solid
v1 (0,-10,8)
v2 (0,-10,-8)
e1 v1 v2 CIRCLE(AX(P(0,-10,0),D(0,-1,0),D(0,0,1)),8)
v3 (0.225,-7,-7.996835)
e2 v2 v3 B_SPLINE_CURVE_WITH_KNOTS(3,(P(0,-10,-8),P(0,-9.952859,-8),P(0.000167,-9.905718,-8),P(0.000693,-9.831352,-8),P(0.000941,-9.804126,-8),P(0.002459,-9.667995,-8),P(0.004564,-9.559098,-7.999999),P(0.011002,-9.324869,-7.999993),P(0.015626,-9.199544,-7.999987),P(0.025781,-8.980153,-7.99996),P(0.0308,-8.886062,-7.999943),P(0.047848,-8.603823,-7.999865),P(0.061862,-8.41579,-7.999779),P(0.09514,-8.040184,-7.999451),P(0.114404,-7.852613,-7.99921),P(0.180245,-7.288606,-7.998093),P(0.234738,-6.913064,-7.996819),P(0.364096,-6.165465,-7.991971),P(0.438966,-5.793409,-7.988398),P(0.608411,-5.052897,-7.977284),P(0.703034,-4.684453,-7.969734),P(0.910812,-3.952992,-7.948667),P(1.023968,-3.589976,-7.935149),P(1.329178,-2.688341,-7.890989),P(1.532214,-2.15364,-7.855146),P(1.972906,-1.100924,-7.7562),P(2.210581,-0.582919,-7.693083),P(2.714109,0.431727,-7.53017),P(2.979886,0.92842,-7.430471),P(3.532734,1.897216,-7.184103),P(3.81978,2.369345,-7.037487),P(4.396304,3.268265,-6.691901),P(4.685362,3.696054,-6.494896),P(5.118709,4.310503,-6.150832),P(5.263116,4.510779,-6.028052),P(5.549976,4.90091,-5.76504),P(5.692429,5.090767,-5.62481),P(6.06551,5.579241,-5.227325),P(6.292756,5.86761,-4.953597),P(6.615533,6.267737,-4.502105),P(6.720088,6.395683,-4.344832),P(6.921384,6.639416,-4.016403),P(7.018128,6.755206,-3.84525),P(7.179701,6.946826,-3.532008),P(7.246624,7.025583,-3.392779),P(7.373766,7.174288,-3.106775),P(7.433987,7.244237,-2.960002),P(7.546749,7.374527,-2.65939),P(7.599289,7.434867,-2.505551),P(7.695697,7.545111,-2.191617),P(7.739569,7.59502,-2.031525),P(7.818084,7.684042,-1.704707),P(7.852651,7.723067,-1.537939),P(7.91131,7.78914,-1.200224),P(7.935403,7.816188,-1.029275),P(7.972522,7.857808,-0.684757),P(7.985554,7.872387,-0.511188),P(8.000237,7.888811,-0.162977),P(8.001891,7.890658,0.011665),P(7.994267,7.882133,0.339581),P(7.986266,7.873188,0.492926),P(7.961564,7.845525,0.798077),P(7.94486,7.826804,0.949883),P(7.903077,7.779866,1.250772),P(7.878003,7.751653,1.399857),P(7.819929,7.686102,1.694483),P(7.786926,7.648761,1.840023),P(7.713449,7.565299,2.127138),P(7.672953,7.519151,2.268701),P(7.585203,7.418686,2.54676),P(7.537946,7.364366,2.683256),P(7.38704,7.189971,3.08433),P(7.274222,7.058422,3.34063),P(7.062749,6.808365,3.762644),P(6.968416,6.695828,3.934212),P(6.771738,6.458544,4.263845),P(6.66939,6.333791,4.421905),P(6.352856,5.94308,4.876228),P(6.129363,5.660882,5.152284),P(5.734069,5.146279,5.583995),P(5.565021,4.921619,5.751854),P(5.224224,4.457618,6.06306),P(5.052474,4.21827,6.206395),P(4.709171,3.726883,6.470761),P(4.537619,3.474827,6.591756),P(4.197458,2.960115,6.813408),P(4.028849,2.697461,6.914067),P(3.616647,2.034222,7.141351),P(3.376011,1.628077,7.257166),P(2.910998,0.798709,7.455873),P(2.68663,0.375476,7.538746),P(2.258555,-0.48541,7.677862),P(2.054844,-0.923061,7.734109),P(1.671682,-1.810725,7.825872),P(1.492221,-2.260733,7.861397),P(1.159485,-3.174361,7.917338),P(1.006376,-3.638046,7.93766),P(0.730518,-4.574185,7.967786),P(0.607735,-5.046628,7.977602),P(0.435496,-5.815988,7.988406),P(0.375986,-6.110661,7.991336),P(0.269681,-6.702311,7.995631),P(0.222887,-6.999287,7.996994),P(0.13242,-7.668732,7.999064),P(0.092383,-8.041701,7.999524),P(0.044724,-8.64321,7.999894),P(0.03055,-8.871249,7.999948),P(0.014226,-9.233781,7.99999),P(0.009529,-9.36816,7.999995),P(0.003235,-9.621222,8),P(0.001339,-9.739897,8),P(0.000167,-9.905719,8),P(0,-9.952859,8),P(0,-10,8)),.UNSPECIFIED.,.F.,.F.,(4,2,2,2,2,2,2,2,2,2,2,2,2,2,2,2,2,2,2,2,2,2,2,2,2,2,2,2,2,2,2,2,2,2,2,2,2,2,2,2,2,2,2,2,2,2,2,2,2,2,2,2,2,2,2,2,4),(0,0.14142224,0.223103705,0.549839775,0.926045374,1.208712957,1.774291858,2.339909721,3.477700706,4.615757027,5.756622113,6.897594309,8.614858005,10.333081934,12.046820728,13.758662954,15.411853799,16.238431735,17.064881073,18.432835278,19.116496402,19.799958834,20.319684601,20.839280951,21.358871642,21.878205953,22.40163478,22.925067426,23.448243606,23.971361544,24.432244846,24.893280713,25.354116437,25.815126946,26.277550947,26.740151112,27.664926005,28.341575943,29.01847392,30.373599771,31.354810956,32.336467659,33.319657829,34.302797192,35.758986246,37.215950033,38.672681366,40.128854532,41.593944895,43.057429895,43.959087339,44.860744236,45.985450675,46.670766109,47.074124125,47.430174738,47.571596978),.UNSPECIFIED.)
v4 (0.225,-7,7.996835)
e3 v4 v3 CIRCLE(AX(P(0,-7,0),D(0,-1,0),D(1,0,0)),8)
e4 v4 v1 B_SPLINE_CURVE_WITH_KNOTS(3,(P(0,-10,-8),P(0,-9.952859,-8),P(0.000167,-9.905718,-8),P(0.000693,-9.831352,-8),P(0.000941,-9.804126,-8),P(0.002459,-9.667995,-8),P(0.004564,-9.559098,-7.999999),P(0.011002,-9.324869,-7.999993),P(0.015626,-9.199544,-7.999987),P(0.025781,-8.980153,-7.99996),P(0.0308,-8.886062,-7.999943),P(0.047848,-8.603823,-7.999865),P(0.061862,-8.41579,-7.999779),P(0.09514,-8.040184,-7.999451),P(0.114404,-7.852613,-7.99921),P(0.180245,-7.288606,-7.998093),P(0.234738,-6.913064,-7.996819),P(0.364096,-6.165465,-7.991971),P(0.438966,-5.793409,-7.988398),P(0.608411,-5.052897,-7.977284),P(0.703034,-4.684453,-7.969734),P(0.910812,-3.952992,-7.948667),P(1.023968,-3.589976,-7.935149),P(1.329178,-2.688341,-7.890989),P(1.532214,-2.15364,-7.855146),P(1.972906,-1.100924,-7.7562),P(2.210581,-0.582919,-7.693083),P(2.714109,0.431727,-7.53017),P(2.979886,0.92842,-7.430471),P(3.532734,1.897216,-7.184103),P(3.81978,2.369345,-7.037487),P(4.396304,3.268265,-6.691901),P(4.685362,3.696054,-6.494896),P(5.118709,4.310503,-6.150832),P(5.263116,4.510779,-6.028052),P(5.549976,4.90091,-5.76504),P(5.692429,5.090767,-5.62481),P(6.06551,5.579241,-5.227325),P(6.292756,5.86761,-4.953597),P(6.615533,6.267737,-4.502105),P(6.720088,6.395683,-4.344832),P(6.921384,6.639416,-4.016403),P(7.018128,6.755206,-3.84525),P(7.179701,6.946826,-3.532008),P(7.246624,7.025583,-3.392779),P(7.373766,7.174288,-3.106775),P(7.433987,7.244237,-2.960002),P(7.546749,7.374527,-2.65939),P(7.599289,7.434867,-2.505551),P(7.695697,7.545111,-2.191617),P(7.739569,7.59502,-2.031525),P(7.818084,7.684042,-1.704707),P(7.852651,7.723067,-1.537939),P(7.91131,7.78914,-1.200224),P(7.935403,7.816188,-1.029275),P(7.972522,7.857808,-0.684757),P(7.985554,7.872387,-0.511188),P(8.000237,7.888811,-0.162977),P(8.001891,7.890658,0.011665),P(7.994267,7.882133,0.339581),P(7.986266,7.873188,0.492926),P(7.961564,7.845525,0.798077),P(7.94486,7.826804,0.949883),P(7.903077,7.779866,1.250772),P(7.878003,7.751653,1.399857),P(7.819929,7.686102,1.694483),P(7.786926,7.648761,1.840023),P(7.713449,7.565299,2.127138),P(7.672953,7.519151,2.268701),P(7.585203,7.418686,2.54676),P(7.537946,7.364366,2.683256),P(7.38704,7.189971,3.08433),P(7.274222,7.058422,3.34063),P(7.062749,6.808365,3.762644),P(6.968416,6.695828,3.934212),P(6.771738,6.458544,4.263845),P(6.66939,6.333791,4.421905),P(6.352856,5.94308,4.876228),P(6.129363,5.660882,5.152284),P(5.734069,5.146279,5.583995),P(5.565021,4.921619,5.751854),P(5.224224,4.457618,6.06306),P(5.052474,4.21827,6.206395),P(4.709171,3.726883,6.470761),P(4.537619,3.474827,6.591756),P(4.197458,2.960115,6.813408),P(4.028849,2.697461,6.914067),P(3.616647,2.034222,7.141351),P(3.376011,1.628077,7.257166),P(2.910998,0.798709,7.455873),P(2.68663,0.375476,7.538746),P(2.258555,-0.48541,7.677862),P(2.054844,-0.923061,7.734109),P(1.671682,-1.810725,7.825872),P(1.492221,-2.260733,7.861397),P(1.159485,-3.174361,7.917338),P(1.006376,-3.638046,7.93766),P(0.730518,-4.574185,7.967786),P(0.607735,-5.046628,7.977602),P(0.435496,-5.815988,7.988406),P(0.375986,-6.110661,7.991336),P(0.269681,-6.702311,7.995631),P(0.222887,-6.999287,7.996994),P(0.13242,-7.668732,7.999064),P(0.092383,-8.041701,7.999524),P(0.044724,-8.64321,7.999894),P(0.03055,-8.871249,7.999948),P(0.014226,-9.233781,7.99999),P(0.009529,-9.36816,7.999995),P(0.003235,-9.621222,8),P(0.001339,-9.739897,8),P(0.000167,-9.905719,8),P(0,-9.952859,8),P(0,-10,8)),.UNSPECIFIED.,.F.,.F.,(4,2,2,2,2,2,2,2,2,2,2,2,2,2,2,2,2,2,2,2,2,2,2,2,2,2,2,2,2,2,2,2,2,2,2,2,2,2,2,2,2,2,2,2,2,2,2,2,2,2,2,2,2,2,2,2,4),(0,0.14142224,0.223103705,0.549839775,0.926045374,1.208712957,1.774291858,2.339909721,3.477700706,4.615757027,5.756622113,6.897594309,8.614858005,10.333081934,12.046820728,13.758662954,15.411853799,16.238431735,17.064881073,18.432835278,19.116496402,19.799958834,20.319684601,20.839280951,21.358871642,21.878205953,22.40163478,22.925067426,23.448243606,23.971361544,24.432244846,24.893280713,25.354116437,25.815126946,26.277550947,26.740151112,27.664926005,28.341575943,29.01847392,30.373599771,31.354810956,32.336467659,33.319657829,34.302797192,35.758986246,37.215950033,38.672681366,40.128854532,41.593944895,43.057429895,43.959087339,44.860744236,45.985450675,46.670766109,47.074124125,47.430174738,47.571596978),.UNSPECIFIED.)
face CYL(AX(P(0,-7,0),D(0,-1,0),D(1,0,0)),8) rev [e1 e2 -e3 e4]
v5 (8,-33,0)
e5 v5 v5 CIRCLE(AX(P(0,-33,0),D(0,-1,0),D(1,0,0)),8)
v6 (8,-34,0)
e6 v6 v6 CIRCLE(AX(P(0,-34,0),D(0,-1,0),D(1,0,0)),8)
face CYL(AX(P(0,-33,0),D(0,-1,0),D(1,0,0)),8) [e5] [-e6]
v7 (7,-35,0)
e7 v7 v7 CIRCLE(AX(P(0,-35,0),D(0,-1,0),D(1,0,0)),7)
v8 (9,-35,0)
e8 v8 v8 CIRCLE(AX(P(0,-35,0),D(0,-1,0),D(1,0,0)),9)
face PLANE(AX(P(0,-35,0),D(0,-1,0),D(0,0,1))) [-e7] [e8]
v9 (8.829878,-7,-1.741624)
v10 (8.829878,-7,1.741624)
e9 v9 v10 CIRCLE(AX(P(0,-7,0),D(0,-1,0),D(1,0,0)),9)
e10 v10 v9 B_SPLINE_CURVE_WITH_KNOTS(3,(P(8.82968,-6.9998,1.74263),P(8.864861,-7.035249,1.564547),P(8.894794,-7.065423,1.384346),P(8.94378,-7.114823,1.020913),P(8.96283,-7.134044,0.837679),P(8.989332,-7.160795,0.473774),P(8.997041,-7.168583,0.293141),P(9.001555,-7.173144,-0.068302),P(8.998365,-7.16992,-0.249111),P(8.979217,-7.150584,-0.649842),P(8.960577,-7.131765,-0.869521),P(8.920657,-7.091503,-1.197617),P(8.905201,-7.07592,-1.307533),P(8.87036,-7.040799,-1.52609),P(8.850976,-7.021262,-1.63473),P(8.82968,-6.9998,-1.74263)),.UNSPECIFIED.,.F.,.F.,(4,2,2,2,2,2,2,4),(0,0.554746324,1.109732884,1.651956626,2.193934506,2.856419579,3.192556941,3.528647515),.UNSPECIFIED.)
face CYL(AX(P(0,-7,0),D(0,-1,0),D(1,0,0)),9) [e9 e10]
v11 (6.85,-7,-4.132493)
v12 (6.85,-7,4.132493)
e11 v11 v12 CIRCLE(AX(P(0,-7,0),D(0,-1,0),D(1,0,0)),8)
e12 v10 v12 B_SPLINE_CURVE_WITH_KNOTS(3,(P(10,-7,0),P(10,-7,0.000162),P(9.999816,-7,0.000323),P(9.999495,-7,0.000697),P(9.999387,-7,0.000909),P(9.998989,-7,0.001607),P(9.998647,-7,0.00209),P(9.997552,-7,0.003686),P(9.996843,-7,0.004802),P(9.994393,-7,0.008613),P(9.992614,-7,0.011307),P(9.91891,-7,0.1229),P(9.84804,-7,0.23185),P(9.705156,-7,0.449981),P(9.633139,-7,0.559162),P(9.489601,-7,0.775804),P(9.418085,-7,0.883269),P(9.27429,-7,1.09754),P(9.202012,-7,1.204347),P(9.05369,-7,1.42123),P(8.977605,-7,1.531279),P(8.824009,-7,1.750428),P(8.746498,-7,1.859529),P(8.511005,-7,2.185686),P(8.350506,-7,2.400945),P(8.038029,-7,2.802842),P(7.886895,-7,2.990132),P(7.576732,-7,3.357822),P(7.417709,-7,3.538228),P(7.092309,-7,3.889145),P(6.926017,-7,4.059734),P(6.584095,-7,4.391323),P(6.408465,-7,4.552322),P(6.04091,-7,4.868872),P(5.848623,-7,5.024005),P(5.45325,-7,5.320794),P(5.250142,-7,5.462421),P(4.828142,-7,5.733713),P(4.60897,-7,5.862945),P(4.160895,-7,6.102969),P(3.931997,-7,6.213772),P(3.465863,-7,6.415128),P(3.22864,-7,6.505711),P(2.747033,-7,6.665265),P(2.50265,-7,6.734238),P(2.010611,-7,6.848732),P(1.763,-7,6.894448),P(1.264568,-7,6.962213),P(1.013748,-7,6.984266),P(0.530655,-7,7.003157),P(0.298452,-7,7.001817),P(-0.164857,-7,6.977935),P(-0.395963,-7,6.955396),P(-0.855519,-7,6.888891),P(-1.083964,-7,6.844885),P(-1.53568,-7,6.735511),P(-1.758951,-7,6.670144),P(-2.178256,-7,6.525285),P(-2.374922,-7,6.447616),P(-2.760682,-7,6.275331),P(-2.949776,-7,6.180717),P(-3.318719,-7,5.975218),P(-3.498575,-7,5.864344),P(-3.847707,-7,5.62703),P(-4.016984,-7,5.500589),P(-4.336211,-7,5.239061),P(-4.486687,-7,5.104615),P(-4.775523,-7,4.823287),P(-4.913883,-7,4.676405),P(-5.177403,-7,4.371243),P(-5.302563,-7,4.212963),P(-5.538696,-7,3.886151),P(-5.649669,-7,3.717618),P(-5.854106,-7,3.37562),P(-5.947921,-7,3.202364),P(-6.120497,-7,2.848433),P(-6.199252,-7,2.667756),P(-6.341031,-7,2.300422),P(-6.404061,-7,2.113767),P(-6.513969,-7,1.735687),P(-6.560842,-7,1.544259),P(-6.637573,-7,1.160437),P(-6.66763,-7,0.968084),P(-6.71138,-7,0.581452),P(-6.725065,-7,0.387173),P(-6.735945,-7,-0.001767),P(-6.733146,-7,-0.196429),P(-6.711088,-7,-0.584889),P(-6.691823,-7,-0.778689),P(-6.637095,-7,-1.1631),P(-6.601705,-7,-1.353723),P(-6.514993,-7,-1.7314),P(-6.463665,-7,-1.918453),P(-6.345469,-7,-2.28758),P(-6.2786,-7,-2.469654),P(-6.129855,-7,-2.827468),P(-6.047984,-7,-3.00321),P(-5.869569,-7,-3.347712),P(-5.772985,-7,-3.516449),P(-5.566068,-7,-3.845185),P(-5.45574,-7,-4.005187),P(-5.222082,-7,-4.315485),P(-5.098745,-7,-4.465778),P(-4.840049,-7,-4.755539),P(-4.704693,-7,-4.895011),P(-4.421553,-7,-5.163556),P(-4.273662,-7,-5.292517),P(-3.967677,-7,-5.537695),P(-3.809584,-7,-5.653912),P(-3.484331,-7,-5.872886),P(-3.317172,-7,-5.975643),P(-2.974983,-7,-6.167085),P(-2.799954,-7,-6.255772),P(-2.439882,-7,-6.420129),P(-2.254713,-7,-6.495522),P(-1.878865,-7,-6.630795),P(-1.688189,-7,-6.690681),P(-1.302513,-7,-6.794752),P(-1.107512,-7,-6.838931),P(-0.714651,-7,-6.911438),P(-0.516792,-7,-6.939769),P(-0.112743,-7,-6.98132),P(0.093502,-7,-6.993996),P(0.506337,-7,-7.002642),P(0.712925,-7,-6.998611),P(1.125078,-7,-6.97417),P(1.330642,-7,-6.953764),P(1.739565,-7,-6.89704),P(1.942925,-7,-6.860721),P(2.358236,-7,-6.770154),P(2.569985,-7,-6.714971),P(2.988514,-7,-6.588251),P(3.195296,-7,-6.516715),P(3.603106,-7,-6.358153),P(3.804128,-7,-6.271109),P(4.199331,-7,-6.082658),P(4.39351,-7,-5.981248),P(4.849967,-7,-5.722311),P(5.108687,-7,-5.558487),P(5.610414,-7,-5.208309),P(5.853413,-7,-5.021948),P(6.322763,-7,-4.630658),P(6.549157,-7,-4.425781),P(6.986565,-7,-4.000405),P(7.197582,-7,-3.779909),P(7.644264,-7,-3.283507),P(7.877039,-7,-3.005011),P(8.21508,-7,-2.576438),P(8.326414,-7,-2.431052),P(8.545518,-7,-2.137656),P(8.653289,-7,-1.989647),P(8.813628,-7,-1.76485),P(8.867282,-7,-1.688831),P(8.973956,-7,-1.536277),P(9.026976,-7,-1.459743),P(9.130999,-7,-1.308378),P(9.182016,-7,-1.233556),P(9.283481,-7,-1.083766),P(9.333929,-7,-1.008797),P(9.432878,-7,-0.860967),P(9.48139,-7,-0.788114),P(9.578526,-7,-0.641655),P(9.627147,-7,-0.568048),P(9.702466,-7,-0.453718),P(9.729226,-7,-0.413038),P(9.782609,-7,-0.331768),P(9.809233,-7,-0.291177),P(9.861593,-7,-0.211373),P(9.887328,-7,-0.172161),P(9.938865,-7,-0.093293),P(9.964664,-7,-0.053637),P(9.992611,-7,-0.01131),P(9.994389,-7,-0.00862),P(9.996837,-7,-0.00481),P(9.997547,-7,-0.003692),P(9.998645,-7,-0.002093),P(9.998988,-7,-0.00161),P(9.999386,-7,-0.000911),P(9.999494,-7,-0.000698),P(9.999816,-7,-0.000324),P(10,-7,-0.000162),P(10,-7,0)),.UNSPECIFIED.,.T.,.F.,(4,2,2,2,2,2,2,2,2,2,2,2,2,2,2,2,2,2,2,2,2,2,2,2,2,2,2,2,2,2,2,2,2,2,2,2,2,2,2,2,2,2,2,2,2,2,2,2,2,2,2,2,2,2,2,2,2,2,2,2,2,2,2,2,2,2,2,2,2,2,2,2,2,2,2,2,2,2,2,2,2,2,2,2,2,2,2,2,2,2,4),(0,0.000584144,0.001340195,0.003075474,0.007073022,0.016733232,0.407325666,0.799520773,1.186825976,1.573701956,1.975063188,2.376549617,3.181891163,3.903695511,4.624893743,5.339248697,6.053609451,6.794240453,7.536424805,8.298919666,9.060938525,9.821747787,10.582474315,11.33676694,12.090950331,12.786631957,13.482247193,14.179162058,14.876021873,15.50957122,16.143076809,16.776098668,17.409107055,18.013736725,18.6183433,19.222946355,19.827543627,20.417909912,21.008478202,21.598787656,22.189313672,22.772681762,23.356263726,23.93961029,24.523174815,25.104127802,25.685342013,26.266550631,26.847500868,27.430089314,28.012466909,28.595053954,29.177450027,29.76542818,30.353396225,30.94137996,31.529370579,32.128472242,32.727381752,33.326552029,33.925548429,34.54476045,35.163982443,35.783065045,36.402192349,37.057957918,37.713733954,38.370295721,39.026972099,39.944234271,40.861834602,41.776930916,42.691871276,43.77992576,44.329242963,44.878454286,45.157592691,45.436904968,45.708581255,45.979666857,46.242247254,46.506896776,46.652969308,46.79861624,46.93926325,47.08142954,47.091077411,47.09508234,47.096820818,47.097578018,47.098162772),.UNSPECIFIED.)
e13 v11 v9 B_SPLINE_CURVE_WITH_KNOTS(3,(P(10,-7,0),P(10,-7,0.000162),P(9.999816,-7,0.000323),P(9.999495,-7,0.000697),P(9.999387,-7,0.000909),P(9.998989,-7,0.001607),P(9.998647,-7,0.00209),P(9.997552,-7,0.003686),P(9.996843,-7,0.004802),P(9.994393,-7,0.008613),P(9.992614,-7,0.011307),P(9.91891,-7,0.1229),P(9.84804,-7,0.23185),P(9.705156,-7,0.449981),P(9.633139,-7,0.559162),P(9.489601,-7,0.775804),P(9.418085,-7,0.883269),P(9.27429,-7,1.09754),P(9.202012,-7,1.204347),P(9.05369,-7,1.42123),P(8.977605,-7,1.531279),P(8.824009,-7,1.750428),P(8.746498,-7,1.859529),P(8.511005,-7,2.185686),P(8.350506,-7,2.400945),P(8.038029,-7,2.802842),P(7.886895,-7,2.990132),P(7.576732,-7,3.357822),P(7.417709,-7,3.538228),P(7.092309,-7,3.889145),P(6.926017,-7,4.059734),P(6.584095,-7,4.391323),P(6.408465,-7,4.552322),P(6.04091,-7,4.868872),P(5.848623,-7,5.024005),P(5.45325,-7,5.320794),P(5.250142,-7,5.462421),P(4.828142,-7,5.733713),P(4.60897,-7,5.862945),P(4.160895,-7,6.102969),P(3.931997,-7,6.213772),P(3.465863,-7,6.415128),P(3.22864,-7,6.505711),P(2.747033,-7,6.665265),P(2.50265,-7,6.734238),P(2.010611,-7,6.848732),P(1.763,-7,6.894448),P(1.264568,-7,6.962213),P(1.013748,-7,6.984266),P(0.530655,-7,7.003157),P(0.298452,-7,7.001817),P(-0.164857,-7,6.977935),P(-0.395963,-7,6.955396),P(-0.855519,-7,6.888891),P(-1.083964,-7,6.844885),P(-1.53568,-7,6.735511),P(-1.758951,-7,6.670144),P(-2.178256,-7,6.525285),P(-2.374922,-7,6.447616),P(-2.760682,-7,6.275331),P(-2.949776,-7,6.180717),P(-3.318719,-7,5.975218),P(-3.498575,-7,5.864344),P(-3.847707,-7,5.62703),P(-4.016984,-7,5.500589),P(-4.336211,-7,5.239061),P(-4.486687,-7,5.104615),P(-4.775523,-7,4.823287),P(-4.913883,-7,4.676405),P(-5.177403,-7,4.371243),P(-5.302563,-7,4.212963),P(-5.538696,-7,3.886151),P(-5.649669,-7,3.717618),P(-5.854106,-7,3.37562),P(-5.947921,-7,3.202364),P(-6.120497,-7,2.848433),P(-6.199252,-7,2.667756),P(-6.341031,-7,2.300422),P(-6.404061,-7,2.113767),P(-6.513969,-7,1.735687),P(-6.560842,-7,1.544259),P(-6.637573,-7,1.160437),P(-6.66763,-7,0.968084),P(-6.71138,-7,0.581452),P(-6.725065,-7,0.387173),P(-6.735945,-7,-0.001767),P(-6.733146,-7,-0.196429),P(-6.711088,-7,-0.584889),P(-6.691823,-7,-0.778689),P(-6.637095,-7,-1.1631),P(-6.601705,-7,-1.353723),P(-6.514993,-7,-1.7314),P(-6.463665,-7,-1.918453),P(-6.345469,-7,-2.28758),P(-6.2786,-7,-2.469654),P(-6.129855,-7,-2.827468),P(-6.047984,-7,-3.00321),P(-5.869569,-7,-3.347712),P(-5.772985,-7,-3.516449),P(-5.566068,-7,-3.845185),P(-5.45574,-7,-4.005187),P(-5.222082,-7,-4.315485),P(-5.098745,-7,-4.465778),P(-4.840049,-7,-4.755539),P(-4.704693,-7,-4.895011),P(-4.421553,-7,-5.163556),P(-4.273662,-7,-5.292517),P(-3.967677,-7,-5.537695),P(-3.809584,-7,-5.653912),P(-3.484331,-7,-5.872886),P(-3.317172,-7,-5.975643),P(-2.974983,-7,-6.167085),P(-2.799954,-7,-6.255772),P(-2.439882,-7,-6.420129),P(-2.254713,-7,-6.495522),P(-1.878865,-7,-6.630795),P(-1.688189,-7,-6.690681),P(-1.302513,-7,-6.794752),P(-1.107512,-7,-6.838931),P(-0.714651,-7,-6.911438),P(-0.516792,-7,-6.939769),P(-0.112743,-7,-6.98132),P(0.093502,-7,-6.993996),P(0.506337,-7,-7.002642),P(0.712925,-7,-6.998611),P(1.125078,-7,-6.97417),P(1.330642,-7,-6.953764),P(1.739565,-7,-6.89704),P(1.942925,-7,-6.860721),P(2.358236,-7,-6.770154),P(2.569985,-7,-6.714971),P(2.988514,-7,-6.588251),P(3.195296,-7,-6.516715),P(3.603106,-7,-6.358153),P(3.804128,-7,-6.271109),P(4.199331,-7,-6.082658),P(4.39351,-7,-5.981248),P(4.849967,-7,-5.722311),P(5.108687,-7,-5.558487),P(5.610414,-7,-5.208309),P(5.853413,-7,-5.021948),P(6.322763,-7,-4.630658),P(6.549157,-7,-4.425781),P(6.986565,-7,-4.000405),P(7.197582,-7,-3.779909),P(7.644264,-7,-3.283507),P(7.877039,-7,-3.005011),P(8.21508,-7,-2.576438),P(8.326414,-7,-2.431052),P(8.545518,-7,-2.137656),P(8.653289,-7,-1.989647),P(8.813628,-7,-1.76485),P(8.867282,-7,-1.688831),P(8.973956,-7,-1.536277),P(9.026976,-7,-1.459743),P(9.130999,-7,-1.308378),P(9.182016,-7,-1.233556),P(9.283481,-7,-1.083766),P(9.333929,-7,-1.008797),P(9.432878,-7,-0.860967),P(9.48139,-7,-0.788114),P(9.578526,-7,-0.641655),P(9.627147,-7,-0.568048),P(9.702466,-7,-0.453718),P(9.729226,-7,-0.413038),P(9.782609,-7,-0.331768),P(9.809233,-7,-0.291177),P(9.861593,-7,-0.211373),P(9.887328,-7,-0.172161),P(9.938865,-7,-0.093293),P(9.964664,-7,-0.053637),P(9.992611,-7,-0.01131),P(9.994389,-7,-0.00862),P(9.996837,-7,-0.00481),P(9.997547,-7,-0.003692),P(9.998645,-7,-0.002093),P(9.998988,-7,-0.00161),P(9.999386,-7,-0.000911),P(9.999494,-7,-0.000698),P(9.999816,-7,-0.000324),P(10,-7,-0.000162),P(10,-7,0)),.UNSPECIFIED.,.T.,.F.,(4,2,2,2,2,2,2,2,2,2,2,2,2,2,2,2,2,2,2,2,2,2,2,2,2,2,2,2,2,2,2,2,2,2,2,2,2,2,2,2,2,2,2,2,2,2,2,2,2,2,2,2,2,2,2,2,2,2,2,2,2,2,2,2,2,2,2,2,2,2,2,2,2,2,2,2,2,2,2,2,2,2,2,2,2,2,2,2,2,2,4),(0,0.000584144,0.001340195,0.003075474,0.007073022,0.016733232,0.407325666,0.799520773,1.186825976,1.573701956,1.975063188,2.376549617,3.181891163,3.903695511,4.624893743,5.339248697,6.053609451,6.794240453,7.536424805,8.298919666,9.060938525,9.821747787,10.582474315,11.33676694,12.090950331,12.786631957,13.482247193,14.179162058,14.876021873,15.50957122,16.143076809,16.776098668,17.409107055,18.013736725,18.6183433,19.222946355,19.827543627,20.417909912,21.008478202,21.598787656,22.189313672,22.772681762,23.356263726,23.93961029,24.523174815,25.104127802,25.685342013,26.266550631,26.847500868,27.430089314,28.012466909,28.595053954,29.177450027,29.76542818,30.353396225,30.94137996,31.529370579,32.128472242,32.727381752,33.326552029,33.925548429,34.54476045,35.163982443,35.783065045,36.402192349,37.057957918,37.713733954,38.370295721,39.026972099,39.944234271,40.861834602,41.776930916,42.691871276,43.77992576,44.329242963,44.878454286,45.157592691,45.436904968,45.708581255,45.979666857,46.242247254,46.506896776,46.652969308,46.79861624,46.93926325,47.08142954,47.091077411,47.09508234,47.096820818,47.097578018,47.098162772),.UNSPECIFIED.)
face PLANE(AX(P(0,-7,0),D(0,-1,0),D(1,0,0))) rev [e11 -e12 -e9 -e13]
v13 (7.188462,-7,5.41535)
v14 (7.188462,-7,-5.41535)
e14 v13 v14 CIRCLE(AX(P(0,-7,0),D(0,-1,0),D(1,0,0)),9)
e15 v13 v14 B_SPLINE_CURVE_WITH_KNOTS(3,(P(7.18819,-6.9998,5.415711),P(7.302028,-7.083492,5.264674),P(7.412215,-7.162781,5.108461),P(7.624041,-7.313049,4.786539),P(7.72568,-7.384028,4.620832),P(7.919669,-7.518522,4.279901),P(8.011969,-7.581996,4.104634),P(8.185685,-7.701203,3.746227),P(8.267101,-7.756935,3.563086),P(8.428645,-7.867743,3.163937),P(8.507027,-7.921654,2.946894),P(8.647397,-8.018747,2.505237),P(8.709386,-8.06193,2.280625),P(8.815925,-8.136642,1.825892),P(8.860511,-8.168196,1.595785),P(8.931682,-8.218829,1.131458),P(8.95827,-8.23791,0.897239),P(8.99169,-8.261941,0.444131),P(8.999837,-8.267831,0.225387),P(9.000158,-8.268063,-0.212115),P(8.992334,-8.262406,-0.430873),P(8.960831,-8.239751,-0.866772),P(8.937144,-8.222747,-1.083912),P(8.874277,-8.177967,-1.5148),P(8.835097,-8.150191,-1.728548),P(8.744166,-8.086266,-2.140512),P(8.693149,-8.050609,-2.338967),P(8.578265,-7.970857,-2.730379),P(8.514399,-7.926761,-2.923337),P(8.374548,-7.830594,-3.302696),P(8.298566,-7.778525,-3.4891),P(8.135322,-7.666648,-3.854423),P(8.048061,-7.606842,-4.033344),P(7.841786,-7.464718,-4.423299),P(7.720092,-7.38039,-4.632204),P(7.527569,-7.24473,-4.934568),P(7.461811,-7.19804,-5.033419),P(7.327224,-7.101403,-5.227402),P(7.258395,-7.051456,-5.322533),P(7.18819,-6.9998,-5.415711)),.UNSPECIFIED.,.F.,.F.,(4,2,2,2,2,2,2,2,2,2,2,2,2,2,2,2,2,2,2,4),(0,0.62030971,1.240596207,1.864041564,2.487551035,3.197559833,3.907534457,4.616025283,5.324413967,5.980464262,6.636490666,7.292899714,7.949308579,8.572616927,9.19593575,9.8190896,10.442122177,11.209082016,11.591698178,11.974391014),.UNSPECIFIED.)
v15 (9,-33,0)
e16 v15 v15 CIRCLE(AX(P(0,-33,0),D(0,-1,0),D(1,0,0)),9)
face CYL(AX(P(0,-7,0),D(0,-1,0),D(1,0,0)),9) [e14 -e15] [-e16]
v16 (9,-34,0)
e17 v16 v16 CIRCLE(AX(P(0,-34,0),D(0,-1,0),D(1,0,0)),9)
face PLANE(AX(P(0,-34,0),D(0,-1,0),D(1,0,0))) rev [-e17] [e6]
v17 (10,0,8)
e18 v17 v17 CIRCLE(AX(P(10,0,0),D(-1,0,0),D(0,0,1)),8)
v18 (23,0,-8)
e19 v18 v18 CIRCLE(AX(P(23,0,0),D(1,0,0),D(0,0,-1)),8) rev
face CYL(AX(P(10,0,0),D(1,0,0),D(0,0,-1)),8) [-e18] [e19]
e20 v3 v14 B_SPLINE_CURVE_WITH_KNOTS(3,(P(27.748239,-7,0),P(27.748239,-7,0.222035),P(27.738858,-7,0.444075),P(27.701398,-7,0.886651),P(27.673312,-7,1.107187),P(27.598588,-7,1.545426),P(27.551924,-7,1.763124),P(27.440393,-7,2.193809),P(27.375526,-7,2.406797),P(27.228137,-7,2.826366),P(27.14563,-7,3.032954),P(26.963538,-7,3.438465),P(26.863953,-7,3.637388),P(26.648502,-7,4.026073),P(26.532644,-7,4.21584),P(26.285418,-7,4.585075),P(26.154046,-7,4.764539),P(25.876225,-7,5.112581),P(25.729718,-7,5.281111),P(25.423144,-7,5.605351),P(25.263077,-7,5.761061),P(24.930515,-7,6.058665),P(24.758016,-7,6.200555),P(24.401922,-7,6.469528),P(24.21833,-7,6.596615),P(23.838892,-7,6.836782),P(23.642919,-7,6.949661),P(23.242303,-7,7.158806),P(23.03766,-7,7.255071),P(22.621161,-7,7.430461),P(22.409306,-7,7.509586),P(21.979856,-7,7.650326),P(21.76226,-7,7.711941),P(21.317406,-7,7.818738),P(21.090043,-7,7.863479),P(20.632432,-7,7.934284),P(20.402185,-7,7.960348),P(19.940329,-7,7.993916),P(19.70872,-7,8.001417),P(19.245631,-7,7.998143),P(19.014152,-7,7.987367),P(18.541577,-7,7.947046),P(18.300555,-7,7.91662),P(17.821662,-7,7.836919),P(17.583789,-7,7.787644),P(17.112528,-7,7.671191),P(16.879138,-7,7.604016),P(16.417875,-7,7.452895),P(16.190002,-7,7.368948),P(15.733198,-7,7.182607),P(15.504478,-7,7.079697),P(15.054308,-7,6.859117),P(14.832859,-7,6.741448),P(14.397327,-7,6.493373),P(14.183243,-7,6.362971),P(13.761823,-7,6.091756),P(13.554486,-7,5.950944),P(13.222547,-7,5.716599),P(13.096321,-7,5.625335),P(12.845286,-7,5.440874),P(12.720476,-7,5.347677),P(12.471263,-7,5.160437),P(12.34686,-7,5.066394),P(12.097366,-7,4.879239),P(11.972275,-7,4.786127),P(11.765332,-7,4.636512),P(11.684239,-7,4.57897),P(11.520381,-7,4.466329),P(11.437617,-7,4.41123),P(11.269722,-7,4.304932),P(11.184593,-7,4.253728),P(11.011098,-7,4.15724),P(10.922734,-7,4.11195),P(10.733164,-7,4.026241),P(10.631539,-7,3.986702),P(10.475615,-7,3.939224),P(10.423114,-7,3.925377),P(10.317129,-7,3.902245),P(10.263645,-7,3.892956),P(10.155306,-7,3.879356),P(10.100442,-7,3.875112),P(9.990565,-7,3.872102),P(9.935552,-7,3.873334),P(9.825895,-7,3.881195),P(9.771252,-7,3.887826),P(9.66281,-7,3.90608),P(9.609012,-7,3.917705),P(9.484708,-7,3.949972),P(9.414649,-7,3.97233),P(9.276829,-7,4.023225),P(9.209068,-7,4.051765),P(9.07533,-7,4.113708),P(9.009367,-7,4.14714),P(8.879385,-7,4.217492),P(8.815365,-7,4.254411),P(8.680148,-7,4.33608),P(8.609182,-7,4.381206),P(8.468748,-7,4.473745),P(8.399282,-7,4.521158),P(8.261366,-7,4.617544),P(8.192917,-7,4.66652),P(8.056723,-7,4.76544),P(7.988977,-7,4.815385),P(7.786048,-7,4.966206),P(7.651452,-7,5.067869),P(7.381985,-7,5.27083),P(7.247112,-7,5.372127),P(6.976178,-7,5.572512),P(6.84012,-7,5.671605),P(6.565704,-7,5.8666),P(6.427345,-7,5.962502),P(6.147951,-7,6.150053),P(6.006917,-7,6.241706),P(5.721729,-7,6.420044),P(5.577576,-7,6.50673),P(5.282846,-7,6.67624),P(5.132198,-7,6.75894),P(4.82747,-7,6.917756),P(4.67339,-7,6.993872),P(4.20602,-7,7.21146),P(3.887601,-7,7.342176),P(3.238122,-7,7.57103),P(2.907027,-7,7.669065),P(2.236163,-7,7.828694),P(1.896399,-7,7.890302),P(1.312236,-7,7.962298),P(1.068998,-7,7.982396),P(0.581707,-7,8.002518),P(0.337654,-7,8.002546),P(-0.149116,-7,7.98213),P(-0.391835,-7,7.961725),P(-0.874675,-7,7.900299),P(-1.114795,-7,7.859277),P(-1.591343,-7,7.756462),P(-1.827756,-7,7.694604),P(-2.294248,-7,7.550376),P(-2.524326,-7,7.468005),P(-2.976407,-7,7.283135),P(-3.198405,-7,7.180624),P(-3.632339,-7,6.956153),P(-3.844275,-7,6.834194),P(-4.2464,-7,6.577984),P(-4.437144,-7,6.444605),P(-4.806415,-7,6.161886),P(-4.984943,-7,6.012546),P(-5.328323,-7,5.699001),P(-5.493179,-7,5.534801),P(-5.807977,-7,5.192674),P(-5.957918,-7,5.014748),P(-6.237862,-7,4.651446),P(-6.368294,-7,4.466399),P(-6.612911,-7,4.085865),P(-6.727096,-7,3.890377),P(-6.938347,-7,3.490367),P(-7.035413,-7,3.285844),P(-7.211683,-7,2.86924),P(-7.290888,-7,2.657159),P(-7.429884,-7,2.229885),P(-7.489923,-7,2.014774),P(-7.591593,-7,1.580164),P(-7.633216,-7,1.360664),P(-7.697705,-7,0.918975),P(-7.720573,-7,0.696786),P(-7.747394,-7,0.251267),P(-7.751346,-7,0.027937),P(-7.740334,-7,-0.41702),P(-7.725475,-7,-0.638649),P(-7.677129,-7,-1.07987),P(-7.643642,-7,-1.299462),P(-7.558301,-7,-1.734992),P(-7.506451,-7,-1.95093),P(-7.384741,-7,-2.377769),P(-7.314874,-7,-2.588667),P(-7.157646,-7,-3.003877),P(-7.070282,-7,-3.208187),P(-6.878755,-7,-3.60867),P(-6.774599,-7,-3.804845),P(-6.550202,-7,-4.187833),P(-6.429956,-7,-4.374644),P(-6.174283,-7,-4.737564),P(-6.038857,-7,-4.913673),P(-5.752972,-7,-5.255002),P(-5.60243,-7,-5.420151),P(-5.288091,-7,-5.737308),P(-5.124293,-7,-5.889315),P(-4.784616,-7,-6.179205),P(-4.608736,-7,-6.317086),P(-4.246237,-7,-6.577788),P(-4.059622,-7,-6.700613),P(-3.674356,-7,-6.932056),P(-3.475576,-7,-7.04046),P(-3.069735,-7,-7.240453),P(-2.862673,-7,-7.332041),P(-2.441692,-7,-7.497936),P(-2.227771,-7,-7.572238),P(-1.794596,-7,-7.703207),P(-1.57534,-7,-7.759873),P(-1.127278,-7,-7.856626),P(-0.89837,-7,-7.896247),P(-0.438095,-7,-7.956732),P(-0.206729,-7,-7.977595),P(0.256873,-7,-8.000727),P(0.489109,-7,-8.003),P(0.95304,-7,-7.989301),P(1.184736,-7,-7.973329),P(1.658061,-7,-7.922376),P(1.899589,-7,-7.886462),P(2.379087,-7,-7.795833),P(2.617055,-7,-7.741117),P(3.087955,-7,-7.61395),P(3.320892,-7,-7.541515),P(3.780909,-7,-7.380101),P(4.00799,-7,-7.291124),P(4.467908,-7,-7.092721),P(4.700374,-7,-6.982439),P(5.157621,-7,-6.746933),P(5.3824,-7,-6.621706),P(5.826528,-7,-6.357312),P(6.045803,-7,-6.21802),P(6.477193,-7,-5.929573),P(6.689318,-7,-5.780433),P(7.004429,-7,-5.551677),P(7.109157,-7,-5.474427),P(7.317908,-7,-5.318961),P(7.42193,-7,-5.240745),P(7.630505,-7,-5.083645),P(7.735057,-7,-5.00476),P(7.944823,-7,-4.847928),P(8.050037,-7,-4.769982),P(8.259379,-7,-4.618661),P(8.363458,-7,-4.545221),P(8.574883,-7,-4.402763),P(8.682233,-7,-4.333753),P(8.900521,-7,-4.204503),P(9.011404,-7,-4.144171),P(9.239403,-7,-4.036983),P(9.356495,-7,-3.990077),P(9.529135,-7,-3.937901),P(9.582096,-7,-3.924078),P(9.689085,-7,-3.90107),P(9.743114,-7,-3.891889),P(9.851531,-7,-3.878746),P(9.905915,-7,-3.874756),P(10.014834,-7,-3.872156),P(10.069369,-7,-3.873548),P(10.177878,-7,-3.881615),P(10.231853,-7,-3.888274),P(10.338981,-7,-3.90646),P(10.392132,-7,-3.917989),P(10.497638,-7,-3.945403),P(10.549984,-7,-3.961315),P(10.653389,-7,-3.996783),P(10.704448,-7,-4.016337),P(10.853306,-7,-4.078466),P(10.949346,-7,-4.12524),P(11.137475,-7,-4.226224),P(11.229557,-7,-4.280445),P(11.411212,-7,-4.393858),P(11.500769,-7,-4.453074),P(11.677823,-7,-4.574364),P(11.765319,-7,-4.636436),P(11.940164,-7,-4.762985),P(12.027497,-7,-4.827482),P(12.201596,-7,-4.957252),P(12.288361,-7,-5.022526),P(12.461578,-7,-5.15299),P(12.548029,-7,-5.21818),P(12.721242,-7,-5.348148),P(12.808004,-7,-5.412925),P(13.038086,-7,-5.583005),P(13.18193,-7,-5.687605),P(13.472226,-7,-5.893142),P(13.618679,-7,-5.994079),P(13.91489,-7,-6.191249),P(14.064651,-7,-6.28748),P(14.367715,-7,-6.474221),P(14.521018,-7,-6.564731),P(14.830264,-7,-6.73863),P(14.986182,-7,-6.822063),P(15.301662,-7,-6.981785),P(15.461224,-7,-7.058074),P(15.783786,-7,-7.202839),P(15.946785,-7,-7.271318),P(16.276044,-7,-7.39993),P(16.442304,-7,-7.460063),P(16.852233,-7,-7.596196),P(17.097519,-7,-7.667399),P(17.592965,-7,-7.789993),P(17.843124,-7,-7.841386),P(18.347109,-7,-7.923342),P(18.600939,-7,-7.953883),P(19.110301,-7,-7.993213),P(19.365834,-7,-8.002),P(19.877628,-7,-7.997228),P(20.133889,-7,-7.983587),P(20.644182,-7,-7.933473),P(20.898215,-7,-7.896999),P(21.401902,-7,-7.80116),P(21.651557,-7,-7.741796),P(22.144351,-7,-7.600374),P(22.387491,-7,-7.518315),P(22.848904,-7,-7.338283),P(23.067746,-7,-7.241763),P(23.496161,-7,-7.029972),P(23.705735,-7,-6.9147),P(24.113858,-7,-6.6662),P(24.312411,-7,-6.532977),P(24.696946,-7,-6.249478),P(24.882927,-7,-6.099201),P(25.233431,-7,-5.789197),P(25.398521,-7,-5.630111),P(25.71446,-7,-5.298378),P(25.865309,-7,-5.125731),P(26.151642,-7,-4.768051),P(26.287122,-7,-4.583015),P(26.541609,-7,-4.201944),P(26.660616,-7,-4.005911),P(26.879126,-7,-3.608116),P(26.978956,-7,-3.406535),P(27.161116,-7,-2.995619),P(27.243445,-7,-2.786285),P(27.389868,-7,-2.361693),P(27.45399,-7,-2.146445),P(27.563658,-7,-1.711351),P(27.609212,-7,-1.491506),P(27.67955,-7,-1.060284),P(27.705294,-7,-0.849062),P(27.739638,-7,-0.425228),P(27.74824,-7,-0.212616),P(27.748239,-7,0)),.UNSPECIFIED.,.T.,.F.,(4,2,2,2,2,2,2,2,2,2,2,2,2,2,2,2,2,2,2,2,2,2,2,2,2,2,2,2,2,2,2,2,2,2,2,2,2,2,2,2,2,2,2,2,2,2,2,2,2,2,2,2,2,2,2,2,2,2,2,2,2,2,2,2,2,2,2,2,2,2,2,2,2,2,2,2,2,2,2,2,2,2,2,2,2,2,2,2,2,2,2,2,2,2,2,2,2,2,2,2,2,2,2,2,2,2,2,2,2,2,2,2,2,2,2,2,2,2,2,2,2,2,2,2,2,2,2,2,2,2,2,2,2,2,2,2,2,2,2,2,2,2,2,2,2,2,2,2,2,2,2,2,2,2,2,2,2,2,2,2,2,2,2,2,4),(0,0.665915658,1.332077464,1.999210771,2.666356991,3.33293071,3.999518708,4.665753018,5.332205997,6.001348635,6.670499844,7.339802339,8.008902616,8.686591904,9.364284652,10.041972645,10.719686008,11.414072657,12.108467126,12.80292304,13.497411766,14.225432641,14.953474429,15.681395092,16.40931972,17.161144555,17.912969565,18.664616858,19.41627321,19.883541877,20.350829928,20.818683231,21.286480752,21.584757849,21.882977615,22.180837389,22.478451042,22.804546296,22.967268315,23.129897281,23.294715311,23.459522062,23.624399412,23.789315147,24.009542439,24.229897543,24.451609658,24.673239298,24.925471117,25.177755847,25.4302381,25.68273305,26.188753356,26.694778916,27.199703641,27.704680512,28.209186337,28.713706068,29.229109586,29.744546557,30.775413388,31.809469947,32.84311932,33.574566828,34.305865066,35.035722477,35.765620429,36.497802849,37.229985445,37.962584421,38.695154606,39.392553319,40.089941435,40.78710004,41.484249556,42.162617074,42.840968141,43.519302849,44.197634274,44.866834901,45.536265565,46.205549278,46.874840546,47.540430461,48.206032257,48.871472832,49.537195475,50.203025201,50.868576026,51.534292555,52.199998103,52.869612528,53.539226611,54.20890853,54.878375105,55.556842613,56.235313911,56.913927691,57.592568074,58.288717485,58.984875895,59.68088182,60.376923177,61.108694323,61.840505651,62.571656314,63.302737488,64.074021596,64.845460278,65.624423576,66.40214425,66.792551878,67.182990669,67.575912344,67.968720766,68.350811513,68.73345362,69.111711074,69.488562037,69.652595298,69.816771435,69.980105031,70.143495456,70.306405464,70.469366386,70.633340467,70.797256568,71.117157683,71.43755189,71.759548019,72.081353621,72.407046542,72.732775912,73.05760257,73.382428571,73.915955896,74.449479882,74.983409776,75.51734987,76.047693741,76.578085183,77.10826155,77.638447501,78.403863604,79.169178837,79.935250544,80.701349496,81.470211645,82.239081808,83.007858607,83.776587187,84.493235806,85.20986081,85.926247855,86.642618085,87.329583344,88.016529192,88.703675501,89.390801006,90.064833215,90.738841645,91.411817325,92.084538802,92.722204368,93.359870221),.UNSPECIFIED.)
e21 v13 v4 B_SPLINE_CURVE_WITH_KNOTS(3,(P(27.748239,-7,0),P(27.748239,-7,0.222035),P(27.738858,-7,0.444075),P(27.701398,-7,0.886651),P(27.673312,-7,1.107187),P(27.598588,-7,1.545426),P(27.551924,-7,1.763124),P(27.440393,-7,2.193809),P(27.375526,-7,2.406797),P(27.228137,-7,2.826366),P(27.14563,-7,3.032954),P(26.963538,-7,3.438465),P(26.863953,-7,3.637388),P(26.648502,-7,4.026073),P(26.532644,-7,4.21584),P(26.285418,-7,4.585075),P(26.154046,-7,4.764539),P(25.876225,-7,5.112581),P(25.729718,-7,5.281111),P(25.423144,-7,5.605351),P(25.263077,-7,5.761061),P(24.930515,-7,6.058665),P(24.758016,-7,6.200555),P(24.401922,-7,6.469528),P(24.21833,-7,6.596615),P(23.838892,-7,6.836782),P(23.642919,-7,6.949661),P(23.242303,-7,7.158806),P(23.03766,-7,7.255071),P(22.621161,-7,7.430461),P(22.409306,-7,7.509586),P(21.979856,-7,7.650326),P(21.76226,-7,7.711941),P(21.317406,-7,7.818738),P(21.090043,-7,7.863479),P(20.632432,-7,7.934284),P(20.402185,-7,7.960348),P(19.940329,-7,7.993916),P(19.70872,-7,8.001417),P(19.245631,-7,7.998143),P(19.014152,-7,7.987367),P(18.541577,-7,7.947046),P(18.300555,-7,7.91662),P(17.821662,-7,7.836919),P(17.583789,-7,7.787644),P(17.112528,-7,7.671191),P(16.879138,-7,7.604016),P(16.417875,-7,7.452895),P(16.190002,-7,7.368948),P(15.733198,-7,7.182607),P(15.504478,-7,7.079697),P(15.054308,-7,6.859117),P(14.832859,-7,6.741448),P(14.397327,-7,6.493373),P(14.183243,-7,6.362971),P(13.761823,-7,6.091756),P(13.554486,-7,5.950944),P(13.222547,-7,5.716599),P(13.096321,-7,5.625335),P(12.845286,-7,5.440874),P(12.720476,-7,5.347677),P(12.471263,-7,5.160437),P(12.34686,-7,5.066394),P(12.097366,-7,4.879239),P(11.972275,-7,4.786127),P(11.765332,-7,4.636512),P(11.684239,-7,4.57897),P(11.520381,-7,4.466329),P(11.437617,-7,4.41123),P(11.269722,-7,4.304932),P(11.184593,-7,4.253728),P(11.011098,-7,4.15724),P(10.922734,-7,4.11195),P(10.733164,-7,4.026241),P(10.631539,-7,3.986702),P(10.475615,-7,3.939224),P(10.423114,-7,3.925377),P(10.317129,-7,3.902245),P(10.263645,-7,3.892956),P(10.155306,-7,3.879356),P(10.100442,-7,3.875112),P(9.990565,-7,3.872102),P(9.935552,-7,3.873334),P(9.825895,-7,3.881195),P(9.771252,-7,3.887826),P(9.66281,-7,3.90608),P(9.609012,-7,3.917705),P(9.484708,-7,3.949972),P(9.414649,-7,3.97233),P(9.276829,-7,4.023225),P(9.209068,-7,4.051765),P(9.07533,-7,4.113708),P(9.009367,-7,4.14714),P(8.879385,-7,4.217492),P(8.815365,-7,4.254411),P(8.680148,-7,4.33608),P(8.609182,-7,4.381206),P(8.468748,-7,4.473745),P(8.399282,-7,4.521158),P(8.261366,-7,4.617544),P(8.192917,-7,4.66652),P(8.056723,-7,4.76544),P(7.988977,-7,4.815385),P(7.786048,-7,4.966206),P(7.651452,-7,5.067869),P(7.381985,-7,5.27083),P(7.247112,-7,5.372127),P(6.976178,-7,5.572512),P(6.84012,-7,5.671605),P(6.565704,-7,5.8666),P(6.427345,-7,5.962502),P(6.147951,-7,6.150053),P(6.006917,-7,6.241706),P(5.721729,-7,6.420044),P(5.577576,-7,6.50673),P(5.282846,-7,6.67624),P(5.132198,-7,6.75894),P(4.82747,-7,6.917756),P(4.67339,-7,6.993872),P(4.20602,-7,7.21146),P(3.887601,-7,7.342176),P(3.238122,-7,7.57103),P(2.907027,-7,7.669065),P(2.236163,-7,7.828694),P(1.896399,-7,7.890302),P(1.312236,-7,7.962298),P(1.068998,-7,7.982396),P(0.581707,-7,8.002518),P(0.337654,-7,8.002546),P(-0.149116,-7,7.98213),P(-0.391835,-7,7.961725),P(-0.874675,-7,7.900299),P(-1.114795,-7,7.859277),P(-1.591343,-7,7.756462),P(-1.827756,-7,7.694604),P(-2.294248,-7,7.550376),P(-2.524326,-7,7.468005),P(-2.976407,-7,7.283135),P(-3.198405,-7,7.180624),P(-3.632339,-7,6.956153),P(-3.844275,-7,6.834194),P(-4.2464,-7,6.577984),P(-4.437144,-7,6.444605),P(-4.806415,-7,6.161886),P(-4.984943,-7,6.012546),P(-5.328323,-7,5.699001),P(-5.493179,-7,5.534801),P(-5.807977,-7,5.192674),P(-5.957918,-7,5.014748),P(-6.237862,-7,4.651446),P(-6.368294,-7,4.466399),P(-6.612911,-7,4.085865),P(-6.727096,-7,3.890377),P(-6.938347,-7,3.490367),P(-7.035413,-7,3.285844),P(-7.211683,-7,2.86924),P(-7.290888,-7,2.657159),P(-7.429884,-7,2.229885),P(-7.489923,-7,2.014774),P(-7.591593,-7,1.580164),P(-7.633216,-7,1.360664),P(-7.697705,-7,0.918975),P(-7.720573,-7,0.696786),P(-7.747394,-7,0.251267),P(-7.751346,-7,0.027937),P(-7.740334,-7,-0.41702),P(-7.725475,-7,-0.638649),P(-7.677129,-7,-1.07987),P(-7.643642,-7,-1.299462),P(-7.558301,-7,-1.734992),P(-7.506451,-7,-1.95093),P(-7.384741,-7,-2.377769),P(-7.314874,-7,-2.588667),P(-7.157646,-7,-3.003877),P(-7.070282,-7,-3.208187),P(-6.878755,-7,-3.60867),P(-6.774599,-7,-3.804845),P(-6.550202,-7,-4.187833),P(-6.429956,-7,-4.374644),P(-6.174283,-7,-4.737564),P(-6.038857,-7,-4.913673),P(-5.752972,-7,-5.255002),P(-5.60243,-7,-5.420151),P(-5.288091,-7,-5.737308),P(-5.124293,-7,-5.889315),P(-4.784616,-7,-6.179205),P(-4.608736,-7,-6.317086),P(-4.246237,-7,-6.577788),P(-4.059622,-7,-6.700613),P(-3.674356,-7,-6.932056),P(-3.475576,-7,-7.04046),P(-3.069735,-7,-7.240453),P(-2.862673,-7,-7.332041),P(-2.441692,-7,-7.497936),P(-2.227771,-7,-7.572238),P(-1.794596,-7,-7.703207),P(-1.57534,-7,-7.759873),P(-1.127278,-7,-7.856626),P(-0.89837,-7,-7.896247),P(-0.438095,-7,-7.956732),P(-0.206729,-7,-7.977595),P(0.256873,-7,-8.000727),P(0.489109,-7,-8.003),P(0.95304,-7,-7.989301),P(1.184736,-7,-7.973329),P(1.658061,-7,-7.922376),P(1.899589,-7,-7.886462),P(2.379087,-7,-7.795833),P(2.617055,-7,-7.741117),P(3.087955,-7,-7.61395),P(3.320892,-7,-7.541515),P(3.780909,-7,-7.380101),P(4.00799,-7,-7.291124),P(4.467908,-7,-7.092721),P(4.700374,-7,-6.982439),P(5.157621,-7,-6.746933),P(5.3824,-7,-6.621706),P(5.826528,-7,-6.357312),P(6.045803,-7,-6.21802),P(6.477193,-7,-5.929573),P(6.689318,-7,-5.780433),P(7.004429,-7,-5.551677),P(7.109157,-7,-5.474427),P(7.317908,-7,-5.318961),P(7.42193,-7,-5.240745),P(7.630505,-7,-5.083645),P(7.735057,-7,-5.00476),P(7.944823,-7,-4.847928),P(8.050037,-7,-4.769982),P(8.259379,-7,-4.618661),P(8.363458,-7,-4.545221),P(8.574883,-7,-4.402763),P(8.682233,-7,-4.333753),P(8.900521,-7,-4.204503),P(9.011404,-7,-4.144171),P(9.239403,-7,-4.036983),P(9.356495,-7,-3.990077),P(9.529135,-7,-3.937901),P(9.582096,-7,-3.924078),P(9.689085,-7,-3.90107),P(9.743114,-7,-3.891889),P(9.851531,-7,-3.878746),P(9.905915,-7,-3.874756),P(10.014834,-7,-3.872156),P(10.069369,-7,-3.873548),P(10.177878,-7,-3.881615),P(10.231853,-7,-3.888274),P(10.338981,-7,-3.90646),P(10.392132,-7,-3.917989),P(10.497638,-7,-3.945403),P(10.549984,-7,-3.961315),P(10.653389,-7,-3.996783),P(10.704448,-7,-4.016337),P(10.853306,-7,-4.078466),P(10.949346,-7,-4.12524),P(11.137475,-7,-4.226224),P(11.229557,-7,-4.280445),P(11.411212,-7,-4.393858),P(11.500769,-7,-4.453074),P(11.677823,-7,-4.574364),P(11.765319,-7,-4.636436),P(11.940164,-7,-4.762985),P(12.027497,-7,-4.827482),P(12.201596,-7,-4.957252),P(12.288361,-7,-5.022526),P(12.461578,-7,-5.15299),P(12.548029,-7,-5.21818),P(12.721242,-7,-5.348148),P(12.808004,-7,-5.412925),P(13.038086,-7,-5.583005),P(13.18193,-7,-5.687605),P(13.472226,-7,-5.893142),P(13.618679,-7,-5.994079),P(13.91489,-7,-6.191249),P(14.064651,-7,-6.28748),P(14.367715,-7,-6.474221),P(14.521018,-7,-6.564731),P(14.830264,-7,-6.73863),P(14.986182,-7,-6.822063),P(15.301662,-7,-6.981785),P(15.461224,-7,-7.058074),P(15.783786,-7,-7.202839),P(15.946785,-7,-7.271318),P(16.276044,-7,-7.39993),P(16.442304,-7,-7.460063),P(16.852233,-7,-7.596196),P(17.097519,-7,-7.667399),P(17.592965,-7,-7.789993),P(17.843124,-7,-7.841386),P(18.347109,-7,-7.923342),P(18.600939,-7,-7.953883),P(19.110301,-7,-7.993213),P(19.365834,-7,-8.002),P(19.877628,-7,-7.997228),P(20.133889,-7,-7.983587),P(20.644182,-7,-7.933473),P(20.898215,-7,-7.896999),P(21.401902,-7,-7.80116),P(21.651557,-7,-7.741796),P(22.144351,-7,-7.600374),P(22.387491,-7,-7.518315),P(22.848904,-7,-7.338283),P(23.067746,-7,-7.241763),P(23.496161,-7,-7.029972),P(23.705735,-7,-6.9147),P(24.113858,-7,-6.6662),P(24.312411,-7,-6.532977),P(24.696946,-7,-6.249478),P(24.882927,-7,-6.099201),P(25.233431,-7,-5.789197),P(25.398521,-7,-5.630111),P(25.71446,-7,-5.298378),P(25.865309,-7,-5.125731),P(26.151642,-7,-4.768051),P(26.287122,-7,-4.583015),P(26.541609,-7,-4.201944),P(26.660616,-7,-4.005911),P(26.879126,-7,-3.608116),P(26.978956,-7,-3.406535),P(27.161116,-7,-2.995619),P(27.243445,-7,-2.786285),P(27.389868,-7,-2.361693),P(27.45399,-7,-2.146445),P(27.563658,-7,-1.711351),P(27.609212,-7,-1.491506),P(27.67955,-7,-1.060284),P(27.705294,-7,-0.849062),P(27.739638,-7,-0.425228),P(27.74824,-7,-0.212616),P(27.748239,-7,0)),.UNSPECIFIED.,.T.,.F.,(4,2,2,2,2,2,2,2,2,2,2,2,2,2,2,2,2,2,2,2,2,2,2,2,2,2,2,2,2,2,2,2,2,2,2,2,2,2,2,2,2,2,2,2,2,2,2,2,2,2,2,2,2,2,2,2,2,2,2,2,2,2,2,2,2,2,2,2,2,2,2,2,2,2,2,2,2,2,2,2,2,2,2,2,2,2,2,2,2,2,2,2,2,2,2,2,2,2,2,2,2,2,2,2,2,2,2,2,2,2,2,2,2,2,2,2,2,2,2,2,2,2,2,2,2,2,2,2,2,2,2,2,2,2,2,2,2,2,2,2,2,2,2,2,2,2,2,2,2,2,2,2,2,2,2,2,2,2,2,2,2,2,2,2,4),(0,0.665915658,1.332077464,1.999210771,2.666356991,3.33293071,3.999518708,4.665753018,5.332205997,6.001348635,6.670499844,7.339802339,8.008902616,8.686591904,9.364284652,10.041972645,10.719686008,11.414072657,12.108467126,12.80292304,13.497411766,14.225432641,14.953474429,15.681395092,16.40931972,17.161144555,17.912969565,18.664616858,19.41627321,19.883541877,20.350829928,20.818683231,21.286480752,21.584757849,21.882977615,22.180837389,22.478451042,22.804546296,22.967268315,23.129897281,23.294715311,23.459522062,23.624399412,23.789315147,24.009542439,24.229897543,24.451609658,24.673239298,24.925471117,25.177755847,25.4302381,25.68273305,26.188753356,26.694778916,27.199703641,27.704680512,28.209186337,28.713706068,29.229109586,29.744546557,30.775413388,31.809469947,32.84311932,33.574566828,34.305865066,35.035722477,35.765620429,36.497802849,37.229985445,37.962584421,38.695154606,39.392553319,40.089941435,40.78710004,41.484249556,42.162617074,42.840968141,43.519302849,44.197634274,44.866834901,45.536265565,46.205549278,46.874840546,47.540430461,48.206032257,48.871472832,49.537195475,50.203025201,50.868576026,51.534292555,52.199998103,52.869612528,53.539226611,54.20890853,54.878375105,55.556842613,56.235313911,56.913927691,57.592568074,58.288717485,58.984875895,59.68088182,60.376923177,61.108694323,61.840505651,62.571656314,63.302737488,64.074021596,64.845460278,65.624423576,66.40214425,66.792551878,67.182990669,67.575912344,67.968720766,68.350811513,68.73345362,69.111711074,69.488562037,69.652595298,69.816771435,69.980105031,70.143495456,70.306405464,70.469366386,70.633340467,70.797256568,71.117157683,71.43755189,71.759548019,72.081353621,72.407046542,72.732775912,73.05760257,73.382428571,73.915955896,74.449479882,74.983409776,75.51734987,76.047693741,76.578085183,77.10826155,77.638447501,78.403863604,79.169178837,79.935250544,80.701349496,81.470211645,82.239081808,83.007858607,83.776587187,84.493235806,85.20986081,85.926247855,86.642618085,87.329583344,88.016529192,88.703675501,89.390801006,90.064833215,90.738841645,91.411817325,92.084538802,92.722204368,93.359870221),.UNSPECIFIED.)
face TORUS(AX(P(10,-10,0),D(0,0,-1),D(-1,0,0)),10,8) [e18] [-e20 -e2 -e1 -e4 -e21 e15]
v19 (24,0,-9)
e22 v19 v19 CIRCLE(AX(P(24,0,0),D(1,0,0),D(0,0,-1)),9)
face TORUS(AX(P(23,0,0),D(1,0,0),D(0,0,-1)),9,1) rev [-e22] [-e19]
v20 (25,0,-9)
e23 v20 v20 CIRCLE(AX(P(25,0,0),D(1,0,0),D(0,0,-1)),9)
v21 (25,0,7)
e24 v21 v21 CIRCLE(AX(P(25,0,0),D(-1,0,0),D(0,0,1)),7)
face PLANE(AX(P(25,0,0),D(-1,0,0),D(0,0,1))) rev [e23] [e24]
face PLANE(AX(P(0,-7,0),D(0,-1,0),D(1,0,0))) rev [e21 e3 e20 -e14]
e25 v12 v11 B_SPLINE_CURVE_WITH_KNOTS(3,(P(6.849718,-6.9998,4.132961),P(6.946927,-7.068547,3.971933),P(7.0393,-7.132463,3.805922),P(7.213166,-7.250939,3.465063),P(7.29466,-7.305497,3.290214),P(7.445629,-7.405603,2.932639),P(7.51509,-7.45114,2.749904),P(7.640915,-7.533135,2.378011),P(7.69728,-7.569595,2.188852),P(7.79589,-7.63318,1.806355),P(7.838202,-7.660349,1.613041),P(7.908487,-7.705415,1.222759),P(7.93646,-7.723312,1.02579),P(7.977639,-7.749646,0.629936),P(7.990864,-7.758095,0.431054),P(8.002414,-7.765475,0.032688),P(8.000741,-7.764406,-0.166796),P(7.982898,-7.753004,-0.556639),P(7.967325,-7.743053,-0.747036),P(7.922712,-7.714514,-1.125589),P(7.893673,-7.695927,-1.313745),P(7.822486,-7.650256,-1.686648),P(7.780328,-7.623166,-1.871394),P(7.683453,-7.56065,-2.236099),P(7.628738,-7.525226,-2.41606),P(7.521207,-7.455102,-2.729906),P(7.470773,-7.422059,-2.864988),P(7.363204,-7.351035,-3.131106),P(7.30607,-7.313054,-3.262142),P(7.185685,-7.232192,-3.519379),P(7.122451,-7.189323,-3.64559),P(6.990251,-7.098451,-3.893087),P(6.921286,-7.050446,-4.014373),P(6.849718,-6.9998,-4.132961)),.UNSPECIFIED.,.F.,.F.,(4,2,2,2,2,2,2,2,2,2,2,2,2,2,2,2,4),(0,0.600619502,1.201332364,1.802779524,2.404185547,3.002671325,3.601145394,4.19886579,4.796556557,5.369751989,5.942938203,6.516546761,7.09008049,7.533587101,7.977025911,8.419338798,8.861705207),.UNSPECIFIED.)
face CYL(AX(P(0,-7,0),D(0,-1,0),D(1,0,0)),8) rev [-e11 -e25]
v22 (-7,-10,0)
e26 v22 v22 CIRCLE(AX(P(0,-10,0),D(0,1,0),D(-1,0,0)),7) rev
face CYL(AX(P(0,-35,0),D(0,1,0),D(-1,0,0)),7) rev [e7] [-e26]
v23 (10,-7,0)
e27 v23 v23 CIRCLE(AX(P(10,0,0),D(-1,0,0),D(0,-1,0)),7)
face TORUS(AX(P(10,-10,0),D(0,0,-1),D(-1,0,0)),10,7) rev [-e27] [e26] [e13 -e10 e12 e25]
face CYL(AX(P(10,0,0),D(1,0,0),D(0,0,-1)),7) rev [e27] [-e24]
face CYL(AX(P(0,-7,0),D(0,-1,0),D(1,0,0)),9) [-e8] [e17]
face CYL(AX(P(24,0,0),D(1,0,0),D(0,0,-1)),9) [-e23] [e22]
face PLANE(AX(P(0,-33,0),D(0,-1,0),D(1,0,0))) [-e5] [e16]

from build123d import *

# Parameters (mm, degrees)
SWEEP_THIN6_PROFILE_R   = 8
SWEEP_THIN6_PROFILE_R_2 = 7
BOSS_EXTRUDE4_START     = -28
SKETCH82_R              = 9
SKETCH82_R_2            = 8
BOSS_EXTRUDE4_DEPTH     = 28
CUT_EXTRUDE4_START      = -2
SKETCH82_2_R            = 9
SKETCH82_2_R_2          = 8
CUT_EXTRUDE4_DEPTH      = 1
SKETCH83_R              = 9
SKETCH83_R_2            = 8
BOSS_EXTRUDE5_DEPTH     = 1
FILLET3_R               = 1


with BuildPart() as part:
    # Sweep-Thin6: sweep along a path in Sketch1
    with BuildLine(Plane.XY) as sweep_thin6_path:
        Line((0, -35), (0, -10))
        ThreePointArc((0, -10), (2.928932188, -2.928932188), (10, 0))
        Line((10, 0), (25, 0))
    # Sweep-Thin6 profile (on start of the path) → Sweep-Thin6 (sweep)
    with BuildSketch(Plane(origin=(0, -35, 0), x_dir=(1, 0, 0), z_dir=(0, 1, 0))):
        Circle(SWEEP_THIN6_PROFILE_R)
        Circle(SWEEP_THIN6_PROFILE_R_2, mode=Mode.SUBTRACT)
    sweep(path=sweep_thin6_path.line)

    # Sketch82 → Boss-Extrude4 (add)
    with BuildSketch(Plane.XZ.offset(35).offset(BOSS_EXTRUDE4_START)):
        Circle(SKETCH82_R)
        Circle(SKETCH82_R_2, mode=Mode.SUBTRACT)
    extrude(amount=BOSS_EXTRUDE4_DEPTH)

    # Sketch82<2> → Cut-Extrude4 (cut)
    with BuildSketch(Plane.XZ.offset(35).offset(CUT_EXTRUDE4_START)):
        Circle(SKETCH82_2_R)
        Circle(SKETCH82_2_R_2, mode=Mode.SUBTRACT)
    extrude(amount=CUT_EXTRUDE4_DEPTH, mode=Mode.SUBTRACT)

    # Sketch83 → Boss-Extrude5 (add)
    with BuildSketch(Plane(origin=(25, 0, 0), x_dir=(0, 0, -1), z_dir=(1, 0, 0))):
        Circle(SKETCH83_R)
        Circle(SKETCH83_R_2, mode=Mode.SUBTRACT)
    extrude(amount=-BOSS_EXTRUDE5_DEPTH)

    # Fillet3
    fillet3_edges = [part.edges().sort_by_distance(p)[0] for p in [
        (24, 8, 0),
    ]]
    fillet(fillet3_edges, radius=FILLET3_R - 0.0001)  # a hair under: the kernel refuses the full size


solid = part.part
